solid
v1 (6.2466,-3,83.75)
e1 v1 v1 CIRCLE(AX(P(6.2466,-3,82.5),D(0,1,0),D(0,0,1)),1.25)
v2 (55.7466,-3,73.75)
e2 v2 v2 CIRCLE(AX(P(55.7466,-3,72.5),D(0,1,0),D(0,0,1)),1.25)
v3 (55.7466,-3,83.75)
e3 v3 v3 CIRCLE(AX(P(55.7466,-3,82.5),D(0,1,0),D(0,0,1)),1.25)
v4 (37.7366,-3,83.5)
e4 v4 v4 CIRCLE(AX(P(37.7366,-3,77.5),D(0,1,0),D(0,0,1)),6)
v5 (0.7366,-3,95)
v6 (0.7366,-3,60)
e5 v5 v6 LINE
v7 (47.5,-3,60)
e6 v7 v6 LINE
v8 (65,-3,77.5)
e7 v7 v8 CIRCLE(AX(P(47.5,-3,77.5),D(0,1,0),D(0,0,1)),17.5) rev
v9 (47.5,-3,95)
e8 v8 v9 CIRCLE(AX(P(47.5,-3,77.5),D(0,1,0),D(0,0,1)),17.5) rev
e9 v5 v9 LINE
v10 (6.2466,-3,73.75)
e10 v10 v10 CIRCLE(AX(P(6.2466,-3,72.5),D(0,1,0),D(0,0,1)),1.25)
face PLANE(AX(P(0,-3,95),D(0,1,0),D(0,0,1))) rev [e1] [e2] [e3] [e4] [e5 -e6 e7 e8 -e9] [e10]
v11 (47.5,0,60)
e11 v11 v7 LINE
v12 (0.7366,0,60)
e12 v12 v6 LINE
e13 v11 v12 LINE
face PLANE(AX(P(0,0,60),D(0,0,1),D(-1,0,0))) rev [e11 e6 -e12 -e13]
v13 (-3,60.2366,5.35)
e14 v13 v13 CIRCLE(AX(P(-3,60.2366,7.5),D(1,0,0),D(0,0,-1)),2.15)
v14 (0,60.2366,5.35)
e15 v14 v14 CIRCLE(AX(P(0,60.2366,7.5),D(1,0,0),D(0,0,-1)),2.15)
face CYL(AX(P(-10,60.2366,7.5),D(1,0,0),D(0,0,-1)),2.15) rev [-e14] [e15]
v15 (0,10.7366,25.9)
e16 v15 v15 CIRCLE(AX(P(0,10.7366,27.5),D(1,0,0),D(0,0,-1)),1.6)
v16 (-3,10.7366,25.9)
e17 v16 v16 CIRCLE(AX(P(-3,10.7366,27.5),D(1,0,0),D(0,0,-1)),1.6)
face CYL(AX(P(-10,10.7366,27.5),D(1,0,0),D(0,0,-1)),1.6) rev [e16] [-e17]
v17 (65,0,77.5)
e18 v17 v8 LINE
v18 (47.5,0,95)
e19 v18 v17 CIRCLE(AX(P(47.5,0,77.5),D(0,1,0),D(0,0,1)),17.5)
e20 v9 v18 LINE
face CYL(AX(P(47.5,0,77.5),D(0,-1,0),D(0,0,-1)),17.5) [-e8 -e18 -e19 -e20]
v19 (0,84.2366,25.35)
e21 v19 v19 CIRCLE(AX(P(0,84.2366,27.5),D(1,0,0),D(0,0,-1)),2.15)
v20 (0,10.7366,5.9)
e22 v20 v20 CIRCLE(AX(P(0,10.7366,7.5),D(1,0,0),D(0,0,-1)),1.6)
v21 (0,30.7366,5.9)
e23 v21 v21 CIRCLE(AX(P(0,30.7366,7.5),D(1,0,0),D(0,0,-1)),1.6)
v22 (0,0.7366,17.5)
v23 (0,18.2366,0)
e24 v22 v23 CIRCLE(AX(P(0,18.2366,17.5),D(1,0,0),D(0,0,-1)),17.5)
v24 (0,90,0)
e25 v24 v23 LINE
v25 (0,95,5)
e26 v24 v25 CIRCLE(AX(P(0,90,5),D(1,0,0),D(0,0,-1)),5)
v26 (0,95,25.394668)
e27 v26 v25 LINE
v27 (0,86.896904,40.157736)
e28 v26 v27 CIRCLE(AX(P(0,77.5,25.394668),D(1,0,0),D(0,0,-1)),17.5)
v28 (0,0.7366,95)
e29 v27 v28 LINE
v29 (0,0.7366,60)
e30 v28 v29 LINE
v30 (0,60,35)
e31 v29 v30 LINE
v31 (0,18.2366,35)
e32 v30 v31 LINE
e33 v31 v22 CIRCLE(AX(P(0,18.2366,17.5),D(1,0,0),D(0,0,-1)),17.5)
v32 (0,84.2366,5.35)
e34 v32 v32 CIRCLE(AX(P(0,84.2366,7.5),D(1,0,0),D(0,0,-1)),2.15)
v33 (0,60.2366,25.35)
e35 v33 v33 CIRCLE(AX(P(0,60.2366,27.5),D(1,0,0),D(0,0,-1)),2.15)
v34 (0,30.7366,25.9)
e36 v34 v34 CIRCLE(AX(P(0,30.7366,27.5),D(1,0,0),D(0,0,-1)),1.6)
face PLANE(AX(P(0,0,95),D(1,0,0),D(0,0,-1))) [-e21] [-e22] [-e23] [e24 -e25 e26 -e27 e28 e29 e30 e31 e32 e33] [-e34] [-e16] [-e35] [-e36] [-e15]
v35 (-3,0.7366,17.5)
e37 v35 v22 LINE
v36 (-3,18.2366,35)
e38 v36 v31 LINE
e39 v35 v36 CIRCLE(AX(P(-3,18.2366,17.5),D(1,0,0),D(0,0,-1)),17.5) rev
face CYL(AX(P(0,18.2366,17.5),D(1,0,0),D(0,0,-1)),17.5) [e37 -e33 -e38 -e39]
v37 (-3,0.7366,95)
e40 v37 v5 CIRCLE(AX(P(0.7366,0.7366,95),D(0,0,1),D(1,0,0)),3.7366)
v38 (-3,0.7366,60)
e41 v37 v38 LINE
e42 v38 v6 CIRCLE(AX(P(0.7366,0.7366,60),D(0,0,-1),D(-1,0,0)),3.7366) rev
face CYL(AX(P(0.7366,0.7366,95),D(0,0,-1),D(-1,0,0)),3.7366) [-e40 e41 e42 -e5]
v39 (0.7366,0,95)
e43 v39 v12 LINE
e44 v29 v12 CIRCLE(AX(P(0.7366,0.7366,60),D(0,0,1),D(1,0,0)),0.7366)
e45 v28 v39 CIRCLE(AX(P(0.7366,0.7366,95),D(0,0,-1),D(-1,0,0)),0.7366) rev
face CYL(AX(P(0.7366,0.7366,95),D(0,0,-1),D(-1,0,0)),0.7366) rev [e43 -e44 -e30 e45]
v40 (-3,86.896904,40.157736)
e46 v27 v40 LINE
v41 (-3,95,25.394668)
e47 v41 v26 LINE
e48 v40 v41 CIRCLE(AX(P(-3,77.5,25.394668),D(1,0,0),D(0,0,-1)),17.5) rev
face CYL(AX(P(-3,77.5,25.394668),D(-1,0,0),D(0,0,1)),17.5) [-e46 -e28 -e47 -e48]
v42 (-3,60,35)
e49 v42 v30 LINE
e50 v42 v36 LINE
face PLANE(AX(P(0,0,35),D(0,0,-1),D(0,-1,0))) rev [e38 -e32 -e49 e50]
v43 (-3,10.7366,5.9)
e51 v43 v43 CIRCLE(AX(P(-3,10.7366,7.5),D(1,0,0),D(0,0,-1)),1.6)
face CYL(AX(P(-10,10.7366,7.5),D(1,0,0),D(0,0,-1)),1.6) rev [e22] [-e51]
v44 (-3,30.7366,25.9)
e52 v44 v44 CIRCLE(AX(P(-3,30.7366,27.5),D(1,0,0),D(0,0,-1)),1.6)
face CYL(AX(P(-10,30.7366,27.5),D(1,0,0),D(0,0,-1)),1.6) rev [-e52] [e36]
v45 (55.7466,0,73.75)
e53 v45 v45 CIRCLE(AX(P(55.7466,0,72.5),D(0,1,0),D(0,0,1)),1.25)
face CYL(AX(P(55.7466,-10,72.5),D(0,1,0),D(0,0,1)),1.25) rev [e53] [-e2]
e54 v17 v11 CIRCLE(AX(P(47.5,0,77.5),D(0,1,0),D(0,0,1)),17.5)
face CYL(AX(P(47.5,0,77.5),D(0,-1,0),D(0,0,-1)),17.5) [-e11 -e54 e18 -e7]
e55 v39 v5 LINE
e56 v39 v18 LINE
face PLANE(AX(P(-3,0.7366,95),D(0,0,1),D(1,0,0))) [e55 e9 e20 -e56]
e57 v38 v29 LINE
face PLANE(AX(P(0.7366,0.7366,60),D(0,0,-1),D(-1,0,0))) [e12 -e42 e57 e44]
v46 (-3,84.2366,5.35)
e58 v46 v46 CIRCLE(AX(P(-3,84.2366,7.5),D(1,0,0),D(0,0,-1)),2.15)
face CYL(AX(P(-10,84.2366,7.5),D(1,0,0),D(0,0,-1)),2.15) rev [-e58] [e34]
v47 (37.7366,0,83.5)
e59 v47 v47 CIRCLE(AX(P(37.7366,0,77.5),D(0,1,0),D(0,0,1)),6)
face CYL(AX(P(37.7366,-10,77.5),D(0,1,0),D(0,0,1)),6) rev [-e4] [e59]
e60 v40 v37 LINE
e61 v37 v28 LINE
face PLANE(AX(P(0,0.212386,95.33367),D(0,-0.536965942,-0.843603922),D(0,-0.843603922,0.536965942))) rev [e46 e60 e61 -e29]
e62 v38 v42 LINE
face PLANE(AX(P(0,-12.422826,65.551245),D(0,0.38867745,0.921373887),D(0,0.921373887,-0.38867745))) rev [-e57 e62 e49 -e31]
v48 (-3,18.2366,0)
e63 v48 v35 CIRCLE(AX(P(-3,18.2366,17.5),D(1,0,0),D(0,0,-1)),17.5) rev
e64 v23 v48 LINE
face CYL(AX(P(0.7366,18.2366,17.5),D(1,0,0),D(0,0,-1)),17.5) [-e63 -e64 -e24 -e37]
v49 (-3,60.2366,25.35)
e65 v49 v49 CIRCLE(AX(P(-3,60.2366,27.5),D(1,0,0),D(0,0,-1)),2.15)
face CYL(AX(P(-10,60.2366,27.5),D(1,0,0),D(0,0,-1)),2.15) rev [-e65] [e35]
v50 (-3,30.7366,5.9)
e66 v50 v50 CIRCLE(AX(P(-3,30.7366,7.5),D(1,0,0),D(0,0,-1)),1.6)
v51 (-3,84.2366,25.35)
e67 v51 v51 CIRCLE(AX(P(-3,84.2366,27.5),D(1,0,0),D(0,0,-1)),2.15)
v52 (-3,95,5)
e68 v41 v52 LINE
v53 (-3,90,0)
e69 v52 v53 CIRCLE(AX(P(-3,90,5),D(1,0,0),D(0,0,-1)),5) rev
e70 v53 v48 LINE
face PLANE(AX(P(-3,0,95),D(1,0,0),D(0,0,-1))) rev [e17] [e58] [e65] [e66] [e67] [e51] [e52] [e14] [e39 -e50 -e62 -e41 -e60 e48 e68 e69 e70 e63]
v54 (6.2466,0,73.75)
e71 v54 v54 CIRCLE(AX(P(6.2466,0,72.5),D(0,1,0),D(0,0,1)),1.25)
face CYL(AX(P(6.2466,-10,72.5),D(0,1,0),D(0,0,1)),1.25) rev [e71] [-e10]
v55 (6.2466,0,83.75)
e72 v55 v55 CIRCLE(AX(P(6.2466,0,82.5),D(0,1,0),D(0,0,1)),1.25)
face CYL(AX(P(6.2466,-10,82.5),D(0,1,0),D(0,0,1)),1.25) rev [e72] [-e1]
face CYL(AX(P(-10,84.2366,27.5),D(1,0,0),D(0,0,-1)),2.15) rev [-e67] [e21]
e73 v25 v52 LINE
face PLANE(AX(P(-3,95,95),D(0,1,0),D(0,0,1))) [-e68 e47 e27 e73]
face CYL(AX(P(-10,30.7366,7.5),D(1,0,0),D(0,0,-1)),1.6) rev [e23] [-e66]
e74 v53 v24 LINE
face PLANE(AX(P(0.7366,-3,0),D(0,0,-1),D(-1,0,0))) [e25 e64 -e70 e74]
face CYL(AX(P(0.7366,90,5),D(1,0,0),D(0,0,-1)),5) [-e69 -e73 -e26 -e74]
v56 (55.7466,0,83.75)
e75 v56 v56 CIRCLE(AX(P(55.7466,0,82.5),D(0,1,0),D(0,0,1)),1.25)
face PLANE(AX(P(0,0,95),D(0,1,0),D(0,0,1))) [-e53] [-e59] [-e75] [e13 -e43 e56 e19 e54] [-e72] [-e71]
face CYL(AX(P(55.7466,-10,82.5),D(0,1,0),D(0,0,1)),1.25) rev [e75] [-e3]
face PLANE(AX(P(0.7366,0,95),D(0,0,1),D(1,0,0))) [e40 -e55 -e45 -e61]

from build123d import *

# Parameters (mm, degrees)
SM_BASE_FLANGE_1_DEPTH = 95
FILLET_1_R             = 17.5
SKETCH_9_R             = 2.15
SKETCH_9_R_2           = 1.6
CUT_EXTRUDE_1_DEPTH    = 10
FILLET_2_R             = 5
CUT_EXTRUDE_START      = -10
CUT_EXTRUDE_2_DEPTH    = 10
SKETCH_14_W            = 71.334593732
SKETCH_14_H            = 13.225299836
CUT_EXTRUDE_3_DEPTH    = 60
FILLET_4_R             = 17.5
FILLET_5_R             = 17.5
SKETCH_15_R            = 6
CUT_EXTRUDE_4_DEPTH    = 10
SKETCH_16_R            = 1.25
CUT_EXTRUDE_5_DEPTH    = 10


# Sheet-metal steps are written as plain solids
with BuildPart() as part:
    # Sketch 2 → 基材-凸緣1 (new body)
    with BuildSketch(Plane.XY):
        with BuildLine():
            Line((65, 0), (0.7366, 0))
            ThreePointArc((0.7366, 0), (0.215745145, 0.215745145), (0, 0.7366))
            Line((0, 0.7366), (0, 95))
            Line((0, 95), (-3, 95))
            Line((-3, 95), (-3, 0.7366))
            ThreePointArc((-3, 0.7366), (-1.905575199, -1.905575199), (0.7366, -3))
            Line((0.7366, -3), (65, -3))
            Line((65, -3), (65, 0))
        make_face()
    extrude(amount=SM_BASE_FLANGE_1_DEPTH)

    # 圓角1
    fillet_1_edges = [part.edges().sort_by_distance(p)[0] for p in [
        (65, -1.5, 95),
        (65, -1.5, 0),
    ]]
    fillet(fillet_1_edges, radius=FILLET_1_R)

    # 草圖9 → 除料-伸長1 (cut)
    with BuildSketch(Plane(origin=(0, 0, 0), x_dir=(0, 0, -1), z_dir=(1, 0, 0))):
        with Locations((-7.5, 60.2366)):
            Circle(SKETCH_9_R)
        with Locations((-27.5, 60.2366)):
            Circle(SKETCH_9_R)
        with BuildLine():
            ThreePointArc((-5.35, 84.2366), (-7.5, 86.3866), (-9.65, 84.2366))
            ThreePointArc((-9.65, 84.2366), (-7.5, 82.0866), (-5.35, 84.2366))
        make_face()
        with Locations((-27.5, 84.2366)):
            Circle(SKETCH_9_R)
        with Locations((-7.5, 30.7366)):
            Circle(SKETCH_9_R_2)
        with Locations((-7.5, 10.7366)):
            Circle(SKETCH_9_R_2)
        with Locations((-27.5, 10.7366)):
            Circle(SKETCH_9_R_2)
        with Locations((-27.5, 30.7366)):
            Circle(SKETCH_9_R_2)
    extrude(amount=-CUT_EXTRUDE_1_DEPTH, mode=Mode.SUBTRACT)

    # 圓角2
    fillet_2_edges = [part.edges().sort_by_distance(p)[0] for p in [
        (-1.5, 95, 95),
        (-1.5, 95, 0),
    ]]
    fillet(fillet_2_edges, radius=FILLET_2_R)

    # 草圖12 → 除料-伸長2 (cut)
    with BuildSketch(Plane(origin=(0, 0, 0), x_dir=(0, 0, -1), z_dir=(1, 0, 0)).offset(CUT_EXTRUDE_START)):
        Polygon((-35, 0.7366), (-35, 60), (-60, 0.7366), align=None)
        with BuildLine():
            Line((-90, 95), (-35, 95))
            Line((-35, 95), (-95, 0.7366))
            Line((-95, 0.7366), (-95, 90))
            ThreePointArc((-95, 90), (-93.535533906, 93.535533906), (-90, 95))
        make_face()
    extrude(amount=CUT_EXTRUDE_2_DEPTH, mode=Mode.SUBTRACT)

    # 草圖14 → 除料-伸長3 (cut)
    with BuildSketch(Plane(origin=(0, 0, 0), x_dir=(-1, 0, 0), z_dir=(0, 0, -1))):
        with Locations((-32.667296866, -5.876049918)):
            Rectangle(SKETCH_14_W, SKETCH_14_H)
    extrude(amount=-CUT_EXTRUDE_3_DEPTH, mode=Mode.SUBTRACT)

    # 圓角4
    fillet_4_edges = [part.edges().sort_by_distance(p)[0] for p in [
        (-1.5, 0.7366, 35),
        (-1.5, 0.7366, 0),
        (65, -1.5, 60),
    ]]
    fillet(fillet_4_edges, radius=FILLET_4_R - 0.0001)  # a hair under: the kernel refuses the full size

    # 圓角5
    fillet_5_edges = [part.edges().sort_by_distance(p)[0] for p in [
        (-1.5, 95, 35),
    ]]
    fillet(fillet_5_edges, radius=FILLET_5_R)

    # 草圖15 → 除料-伸長4 (cut)
    with BuildSketch(Plane(origin=(0, 0, 0), x_dir=(1, 0, 0), z_dir=(0, 1, 0))):
        with Locations(Location((37.7366, -77.5, 0), (0, 0, 270))):
            Circle(SKETCH_15_R)
    extrude(amount=-CUT_EXTRUDE_4_DEPTH, mode=Mode.SUBTRACT)

    # 草圖16 → 除料-伸長5 (cut)
    with BuildSketch(Plane(origin=(0, 0, 0), x_dir=(1, 0, 0), z_dir=(0, 1, 0))):
        with Locations(Location((6.2466, -72.5, 0), (0, 0, 270))):
            Circle(SKETCH_16_R)
        with Locations(Location((55.7466, -72.5, 0), (0, 0, 270))):
            Circle(SKETCH_16_R)
        with Locations(Location((55.7466, -82.5, 0), (0, 0, 270))):
            Circle(SKETCH_16_R)
        with Locations(Location((6.2466, -82.5, 0), (0, 0, 270))):
            Circle(SKETCH_16_R)
    extrude(amount=-CUT_EXTRUDE_5_DEPTH, mode=Mode.SUBTRACT)


solid = part.part
